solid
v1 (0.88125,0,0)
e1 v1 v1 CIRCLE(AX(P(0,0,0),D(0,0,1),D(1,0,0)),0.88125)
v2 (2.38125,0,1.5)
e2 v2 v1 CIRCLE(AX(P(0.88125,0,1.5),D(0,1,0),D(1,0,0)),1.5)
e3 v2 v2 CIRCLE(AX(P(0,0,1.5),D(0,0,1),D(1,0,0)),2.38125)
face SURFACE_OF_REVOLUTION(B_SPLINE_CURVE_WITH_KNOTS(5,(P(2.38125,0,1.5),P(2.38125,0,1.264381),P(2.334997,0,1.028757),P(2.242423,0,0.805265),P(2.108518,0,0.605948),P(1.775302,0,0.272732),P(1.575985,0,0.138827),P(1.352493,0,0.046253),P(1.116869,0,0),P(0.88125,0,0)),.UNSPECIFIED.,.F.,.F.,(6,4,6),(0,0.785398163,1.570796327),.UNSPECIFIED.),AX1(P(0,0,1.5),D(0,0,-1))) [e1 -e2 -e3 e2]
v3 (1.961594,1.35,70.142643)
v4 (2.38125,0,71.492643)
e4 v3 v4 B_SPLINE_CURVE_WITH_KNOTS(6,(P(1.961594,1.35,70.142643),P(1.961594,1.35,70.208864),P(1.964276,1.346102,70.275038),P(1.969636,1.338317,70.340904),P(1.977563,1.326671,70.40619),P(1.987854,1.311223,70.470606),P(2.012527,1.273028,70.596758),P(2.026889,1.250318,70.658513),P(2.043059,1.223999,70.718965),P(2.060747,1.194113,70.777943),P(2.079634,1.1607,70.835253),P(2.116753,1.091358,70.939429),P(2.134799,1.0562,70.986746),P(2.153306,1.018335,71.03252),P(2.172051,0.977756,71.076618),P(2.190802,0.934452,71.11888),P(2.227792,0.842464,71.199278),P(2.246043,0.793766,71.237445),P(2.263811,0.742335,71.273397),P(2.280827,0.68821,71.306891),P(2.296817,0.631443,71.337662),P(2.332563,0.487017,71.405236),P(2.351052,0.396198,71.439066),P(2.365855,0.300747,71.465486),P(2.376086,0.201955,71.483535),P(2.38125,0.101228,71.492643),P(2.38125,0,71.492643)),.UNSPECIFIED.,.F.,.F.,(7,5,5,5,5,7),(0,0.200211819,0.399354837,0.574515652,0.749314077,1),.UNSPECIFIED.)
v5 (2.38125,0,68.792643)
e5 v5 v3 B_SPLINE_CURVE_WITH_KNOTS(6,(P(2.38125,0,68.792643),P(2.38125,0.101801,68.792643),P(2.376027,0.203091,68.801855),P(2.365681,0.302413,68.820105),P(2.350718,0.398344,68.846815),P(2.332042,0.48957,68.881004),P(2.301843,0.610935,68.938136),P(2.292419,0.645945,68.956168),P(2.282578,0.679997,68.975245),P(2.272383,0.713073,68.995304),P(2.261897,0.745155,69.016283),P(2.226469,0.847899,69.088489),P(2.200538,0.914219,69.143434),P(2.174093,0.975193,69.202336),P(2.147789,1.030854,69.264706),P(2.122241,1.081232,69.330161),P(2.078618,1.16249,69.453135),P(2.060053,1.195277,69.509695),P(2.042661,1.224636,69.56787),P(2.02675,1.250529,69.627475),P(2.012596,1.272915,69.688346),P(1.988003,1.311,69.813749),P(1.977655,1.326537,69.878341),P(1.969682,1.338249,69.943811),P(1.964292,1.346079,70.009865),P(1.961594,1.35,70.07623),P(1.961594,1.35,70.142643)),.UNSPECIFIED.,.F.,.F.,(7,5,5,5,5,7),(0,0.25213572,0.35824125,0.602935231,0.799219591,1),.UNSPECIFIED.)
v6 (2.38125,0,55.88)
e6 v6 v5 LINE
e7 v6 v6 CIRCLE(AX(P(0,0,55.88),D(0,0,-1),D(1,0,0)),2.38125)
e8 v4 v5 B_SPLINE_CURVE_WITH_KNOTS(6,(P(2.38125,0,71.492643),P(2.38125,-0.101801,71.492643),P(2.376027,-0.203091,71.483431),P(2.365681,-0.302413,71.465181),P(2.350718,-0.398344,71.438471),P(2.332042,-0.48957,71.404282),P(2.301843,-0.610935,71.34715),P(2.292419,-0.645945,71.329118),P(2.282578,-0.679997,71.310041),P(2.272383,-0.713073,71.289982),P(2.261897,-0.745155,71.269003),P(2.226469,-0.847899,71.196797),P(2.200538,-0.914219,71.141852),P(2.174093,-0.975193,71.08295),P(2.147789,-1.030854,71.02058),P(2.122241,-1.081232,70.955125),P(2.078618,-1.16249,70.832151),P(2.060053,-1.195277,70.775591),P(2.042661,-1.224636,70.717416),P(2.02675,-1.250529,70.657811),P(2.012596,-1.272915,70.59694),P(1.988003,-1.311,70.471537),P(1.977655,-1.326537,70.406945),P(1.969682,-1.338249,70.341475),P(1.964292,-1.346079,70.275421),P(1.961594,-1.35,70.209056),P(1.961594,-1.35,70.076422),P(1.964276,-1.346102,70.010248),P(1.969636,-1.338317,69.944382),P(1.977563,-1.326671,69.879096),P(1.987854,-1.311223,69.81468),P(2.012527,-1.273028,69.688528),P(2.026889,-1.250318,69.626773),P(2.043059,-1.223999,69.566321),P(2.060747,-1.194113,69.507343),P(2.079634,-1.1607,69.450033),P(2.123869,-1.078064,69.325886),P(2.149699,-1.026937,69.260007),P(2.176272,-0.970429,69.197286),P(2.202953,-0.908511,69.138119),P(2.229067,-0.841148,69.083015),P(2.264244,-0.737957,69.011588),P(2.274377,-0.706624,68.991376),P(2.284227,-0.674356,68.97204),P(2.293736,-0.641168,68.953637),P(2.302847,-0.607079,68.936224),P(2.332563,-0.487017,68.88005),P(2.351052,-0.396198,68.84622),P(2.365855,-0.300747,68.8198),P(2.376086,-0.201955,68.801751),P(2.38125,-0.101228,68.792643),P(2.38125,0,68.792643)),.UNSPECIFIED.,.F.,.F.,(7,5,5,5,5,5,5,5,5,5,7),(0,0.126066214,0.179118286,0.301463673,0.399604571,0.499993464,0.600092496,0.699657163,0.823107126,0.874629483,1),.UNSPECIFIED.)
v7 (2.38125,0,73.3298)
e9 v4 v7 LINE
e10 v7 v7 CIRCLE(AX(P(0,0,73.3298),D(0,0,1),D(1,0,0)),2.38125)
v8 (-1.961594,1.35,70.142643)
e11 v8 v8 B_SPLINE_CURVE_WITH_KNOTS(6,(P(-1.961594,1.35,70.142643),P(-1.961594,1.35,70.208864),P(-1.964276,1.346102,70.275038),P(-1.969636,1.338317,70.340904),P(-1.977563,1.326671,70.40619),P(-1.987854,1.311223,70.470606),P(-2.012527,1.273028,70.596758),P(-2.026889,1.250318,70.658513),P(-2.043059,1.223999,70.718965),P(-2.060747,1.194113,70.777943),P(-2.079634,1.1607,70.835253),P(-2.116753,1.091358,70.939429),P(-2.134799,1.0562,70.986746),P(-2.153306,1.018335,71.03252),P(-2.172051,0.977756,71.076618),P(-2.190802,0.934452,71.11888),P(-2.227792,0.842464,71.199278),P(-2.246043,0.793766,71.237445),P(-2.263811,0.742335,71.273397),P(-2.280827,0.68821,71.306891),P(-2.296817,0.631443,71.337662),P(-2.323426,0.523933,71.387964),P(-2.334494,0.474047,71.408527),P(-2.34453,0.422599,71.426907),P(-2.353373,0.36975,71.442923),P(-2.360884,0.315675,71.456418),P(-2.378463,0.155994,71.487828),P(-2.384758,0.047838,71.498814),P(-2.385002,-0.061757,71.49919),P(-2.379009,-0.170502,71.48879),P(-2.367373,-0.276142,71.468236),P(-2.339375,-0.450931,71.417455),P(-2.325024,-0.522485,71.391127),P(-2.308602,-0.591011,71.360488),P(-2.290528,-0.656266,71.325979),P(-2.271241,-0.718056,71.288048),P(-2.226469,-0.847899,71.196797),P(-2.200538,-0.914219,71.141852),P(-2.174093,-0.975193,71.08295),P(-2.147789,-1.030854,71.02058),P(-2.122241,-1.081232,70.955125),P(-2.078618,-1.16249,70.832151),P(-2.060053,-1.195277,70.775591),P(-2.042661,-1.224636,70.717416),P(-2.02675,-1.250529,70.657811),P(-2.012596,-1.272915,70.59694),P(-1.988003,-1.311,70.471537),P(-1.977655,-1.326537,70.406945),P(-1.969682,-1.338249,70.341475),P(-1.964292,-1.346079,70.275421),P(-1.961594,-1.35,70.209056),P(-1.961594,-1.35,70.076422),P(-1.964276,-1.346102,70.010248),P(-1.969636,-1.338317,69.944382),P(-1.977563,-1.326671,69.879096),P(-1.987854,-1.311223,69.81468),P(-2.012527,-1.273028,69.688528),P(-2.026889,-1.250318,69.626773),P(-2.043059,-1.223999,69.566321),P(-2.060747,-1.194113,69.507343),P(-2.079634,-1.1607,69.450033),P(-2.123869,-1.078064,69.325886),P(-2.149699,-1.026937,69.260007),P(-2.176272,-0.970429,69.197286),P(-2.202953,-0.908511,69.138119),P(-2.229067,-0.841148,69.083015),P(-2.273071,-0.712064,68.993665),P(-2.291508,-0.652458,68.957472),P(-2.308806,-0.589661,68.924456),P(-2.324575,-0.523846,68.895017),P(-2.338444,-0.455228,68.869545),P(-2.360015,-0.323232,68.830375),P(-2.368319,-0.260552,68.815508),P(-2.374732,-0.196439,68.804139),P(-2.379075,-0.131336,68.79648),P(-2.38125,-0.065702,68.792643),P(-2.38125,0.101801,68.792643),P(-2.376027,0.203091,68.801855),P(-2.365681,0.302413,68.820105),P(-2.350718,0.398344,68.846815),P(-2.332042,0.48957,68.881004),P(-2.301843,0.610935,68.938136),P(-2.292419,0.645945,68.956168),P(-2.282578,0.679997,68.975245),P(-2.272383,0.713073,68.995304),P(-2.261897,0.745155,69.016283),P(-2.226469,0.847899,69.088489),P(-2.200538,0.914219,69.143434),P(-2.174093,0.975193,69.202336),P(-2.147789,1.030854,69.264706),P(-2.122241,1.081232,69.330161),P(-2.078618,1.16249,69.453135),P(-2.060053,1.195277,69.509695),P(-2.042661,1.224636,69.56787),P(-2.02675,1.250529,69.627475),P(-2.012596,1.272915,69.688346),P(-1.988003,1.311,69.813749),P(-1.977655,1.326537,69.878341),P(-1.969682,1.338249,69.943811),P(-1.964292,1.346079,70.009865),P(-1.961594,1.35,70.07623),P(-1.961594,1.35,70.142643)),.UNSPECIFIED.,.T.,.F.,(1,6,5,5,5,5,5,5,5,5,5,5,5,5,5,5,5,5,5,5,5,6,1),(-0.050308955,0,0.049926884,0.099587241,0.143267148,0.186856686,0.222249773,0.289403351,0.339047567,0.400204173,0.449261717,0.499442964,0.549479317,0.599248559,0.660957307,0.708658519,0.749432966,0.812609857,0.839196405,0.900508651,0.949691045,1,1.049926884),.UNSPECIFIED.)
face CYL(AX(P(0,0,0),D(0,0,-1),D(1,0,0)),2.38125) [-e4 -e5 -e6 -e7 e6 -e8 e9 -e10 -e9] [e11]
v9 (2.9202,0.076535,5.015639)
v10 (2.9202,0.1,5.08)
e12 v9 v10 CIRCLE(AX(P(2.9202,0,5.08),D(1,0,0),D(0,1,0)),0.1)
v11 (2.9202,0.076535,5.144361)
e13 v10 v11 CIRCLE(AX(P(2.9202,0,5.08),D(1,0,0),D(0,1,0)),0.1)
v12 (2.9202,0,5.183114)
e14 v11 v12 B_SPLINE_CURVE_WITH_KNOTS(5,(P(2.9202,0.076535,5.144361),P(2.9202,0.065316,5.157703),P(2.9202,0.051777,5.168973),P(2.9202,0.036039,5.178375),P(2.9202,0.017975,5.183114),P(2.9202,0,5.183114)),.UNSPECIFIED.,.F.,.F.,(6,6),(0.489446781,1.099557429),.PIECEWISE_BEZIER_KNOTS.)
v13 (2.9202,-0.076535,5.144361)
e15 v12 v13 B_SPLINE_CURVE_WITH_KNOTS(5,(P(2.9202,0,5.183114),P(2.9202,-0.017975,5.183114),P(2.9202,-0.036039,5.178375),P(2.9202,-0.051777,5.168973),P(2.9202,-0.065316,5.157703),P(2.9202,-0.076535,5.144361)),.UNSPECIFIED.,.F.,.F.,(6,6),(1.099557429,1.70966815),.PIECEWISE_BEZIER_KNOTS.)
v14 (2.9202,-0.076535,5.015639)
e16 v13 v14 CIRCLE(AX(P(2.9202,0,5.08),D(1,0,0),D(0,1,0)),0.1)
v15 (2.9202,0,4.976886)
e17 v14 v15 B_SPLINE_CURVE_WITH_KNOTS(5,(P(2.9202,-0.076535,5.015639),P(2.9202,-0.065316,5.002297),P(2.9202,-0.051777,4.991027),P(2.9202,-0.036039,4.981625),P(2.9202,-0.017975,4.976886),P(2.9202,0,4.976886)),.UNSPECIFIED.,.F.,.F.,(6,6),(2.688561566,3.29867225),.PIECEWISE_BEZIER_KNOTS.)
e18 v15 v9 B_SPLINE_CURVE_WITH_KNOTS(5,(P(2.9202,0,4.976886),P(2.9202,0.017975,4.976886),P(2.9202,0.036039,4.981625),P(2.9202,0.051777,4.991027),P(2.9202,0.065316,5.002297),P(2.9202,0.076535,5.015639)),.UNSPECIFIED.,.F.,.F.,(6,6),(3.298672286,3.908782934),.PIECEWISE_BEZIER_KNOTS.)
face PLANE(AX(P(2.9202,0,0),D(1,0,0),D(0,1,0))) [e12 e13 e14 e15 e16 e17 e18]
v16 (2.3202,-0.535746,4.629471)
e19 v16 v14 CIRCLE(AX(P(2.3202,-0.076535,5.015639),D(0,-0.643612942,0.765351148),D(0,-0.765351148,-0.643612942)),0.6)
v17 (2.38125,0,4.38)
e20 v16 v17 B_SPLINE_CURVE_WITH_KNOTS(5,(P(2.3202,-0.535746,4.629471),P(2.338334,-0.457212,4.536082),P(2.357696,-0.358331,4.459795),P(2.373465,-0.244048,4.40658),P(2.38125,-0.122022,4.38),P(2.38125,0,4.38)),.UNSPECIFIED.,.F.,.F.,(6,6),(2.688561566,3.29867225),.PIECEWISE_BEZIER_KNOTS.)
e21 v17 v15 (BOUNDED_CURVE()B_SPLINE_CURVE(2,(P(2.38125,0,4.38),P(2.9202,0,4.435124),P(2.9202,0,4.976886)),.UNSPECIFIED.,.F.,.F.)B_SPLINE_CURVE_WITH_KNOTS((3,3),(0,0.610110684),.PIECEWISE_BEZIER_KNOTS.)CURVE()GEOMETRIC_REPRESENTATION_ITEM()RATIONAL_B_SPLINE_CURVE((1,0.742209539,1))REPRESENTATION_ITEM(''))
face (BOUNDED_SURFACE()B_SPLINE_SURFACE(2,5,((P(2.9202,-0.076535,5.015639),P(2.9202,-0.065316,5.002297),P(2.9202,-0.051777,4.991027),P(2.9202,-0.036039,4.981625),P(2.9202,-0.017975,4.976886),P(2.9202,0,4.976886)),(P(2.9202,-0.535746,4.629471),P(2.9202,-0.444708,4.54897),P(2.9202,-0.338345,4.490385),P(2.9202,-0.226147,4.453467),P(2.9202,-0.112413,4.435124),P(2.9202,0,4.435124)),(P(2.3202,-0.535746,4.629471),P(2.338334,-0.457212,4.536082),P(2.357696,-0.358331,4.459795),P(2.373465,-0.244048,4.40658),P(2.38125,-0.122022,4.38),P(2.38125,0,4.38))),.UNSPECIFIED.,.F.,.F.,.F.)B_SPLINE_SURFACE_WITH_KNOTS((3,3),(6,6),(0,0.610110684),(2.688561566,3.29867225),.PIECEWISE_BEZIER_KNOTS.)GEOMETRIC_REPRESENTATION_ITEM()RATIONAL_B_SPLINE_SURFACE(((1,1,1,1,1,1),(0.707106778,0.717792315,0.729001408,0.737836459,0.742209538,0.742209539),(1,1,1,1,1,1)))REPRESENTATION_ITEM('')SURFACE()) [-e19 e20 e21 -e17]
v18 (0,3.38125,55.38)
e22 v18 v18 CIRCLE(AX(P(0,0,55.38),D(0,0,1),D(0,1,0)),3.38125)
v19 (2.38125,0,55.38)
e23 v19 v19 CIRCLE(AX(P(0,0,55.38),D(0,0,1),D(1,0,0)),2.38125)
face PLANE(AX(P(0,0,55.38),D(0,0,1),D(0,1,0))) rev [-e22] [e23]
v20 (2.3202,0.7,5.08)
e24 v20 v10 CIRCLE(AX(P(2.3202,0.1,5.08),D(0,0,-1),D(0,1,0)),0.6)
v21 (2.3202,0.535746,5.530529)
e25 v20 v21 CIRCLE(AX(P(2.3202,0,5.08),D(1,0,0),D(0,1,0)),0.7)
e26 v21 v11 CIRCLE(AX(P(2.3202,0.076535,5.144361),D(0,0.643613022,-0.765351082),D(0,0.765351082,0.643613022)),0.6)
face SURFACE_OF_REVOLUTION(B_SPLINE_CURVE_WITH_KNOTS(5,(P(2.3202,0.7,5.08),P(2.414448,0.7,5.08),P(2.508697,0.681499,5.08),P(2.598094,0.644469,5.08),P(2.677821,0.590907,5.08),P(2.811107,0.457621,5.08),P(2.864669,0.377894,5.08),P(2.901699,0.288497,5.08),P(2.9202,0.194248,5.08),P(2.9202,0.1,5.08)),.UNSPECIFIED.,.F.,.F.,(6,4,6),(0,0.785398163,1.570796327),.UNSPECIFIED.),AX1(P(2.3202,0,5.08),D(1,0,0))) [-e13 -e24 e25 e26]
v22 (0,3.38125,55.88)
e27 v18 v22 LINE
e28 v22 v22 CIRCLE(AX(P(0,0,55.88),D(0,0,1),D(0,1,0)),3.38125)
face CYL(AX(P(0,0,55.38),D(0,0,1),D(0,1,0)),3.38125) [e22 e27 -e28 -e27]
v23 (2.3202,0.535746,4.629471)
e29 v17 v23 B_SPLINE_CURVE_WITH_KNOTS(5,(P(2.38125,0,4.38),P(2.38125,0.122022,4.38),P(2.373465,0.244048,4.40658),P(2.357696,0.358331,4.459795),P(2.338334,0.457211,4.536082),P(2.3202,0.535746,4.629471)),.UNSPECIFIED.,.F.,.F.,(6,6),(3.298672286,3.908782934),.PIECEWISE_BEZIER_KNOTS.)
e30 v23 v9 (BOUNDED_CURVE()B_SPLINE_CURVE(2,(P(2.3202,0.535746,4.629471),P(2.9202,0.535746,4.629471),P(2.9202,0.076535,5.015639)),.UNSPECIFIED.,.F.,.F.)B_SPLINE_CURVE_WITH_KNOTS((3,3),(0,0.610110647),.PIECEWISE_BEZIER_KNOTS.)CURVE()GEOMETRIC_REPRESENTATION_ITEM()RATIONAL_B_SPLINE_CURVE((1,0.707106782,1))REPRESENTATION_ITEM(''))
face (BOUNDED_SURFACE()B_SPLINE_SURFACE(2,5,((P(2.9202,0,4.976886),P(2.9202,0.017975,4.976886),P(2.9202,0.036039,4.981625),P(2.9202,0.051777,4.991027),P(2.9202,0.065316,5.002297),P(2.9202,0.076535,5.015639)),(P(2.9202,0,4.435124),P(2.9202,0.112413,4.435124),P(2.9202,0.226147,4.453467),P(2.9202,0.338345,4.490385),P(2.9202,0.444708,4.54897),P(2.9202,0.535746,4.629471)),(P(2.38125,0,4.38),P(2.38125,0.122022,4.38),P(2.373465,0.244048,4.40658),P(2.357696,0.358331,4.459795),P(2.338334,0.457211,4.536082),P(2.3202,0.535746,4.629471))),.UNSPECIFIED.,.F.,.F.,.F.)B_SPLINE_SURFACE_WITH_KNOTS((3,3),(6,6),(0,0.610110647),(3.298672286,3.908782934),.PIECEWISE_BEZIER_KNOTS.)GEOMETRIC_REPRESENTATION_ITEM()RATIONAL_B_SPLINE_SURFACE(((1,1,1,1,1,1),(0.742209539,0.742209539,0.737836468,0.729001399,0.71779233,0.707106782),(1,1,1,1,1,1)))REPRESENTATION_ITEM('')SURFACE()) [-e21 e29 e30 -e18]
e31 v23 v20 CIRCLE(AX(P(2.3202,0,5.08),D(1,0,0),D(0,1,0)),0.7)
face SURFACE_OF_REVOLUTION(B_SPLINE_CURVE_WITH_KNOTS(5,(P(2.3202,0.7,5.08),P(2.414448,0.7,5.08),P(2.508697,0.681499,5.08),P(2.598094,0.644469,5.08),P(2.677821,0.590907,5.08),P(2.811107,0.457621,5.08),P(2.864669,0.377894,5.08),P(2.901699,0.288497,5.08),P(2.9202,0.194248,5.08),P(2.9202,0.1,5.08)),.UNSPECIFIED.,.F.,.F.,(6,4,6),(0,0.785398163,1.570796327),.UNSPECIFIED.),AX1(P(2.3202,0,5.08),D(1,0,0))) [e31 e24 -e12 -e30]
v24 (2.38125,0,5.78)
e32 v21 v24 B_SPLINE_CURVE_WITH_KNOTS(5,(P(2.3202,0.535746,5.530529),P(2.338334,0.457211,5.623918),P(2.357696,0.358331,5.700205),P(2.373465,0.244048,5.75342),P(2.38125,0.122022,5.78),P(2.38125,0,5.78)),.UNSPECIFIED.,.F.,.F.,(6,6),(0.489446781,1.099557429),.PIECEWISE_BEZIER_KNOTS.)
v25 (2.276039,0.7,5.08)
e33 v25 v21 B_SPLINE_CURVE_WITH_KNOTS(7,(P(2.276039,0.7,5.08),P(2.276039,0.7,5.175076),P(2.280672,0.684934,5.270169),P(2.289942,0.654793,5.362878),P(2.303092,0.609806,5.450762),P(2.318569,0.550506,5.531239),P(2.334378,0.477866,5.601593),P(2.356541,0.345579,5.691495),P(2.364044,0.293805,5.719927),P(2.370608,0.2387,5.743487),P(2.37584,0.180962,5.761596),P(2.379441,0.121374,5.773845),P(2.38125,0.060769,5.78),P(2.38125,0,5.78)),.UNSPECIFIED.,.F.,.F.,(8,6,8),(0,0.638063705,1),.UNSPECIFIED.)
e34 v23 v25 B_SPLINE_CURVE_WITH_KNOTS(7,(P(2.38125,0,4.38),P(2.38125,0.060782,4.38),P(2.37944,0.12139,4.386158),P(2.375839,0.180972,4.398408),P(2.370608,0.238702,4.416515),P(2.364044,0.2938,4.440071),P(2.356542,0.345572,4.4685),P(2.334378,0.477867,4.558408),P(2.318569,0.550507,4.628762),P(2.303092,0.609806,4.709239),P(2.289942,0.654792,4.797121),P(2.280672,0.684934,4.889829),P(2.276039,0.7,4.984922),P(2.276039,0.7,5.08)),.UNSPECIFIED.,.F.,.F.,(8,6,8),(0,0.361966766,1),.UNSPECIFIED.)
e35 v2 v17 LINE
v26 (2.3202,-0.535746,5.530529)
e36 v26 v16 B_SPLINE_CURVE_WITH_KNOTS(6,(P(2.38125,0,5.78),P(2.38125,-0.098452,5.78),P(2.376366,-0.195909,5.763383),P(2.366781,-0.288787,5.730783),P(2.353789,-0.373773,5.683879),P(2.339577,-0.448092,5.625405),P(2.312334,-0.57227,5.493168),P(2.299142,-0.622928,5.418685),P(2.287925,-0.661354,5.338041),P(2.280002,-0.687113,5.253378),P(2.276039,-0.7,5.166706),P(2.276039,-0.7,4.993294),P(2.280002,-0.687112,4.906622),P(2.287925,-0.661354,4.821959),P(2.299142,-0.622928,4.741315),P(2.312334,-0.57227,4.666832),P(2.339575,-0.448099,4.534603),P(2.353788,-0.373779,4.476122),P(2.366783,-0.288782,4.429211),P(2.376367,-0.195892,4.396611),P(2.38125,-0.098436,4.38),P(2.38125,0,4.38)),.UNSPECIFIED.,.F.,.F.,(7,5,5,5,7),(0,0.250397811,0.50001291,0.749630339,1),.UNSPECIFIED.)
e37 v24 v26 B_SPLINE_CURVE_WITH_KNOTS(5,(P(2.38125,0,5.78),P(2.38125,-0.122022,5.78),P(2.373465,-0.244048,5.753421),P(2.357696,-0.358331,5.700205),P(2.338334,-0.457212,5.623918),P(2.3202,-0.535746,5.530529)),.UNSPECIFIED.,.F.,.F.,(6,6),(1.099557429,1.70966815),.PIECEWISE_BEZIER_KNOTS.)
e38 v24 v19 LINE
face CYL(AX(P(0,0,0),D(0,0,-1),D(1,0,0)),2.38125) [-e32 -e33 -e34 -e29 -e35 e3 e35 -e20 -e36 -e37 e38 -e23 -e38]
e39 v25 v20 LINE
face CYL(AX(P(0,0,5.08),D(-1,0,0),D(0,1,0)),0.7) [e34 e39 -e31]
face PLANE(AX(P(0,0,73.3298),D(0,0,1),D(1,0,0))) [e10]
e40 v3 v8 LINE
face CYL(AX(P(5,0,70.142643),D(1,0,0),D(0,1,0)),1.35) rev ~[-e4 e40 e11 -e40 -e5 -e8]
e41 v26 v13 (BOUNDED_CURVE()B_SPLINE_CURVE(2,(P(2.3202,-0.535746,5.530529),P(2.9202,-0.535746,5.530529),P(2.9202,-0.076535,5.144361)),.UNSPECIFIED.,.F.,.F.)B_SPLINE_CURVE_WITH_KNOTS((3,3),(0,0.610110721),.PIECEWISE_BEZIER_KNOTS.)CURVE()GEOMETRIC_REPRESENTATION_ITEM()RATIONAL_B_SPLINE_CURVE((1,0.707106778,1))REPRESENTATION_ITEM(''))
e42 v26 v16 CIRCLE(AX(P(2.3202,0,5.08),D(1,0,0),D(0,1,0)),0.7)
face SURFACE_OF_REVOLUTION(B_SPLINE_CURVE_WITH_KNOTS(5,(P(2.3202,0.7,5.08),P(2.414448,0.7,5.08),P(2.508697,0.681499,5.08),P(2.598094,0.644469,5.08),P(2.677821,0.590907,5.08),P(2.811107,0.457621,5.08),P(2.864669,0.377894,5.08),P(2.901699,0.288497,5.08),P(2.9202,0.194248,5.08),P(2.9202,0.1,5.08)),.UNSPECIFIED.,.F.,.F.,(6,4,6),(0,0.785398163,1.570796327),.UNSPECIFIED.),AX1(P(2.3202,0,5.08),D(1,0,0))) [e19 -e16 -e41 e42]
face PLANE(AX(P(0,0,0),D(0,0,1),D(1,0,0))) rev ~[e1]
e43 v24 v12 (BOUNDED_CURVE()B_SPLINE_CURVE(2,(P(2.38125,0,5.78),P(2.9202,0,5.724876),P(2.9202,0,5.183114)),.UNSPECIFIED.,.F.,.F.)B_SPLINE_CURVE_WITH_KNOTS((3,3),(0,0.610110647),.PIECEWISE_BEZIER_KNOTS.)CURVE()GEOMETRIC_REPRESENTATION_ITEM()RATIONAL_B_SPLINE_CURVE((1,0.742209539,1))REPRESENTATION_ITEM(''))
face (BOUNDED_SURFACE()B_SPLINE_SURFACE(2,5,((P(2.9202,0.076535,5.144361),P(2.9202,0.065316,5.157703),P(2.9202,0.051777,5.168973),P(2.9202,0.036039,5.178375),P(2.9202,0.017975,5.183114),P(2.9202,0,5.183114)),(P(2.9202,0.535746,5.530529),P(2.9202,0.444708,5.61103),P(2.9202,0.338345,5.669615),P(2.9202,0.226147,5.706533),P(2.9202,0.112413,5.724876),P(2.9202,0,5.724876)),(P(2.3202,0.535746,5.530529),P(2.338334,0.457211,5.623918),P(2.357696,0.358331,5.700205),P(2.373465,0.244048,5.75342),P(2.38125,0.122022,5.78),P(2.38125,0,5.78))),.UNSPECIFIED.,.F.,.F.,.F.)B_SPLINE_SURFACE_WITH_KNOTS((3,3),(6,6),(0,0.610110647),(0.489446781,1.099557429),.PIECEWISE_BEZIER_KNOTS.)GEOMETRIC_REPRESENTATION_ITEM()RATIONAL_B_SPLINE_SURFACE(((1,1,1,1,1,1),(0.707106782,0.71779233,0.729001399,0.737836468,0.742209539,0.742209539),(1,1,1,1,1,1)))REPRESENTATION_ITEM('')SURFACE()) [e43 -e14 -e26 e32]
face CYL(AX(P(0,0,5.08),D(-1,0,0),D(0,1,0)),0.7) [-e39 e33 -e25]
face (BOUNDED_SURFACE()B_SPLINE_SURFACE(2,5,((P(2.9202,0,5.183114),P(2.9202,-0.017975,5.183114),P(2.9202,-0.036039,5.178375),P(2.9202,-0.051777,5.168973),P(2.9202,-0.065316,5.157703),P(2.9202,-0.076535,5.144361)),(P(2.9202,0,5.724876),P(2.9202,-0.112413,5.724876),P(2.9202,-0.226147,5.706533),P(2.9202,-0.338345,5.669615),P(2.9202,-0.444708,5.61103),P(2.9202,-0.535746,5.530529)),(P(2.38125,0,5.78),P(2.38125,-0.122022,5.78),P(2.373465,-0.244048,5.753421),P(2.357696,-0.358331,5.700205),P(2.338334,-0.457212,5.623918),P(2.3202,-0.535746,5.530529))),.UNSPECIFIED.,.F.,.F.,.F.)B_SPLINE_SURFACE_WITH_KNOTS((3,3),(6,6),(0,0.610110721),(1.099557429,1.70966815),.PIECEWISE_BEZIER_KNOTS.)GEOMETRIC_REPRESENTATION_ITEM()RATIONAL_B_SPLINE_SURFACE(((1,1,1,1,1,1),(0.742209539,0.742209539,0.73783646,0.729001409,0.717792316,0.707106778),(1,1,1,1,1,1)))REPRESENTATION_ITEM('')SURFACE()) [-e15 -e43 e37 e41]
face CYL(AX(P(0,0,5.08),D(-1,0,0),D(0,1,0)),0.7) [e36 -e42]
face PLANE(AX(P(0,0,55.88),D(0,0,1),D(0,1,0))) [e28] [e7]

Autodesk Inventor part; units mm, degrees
ref_plane "XZ Plane" through (0, 0, 0) normal (0, 1, 0) x (-1, 0, 0)
ref_plane "XY Plane" through (0, 0, 0) normal (0, 0, 1) x (1, 0, 0)
sketch "Sketch1" plane through (0, 0, 0) normal (0, 0, 1) x (1, 0, 0)
  circle A0 centre (0, 0) radius 2.38125
  dimension "d0" = 4.7625
extrude "Extrusion1" add sketch "Sketch1" along normal blind 73.3298
ref_plane "Work Plane1" through (5, 0, 0) normal (1, 0, 0) x (0, 1, 0)
sketch "Sketch2" plane through (5, 0, 0) normal (1, 0, 0) x (0, 1, 0)
  line L0 (-2.38125, 73.3298) -> (2.38125, 73.3298)
  line L1 (-2.38125, 0) -> (2.38125, 0)
  line L2 (-2.38125, 0) -> (-2.38125, 73.3298)
  line L3 (2.38125, 0) -> (2.38125, 73.3298)
  circle A0 centre (0, 70.142643) radius 1.35
  point P0 (0, 0)
  dimension "d4" = 2.7
extrude "Extrusion2" cut sketch "Sketch2" against normal blind 39.4202 contours A0
sketch "Sketch3" plane through (0, 0, 0) normal (1, 0, 0) x (0, 1, 0)
  arc A0 (-1.35, 70.142643) -> (-1.35, 70.142643) centre (-1.35, 70.142643) ccw
  arc A1 (-1.35, 70.142643) -> (-1.35, 70.142643) centre (-1.35, 70.142643) ccw
  line L0 (-2.38125, 73.3298) -> (2.38125, 73.3298)
  line L1 (-2.38125, 0) -> (2.38125, 0)
  line L2 (2.38125, 0) -> (2.38125, 73.3298)
  line L3 (-2.38125, 0) -> (-2.38125, 73.3298)
  line L4 (2.38125, 55.88) -> (3.38125, 55.88)
  line L5 (3.38125, 55.88) -> (3.38125, 55.38)
  line L6 (3.38125, 55.38) -> (2.38125, 55.38)
  line L7 (2.38125, 55.38) -> (2.38125, 55.88)
  line L8 (0, -14.66596) -> (0, 87.99576)
  point P0 (0, 0)
  dimension "d7" = 1
  dimension "d8" = 0.5
  dimension "d9" = 17.4498
sketch "Sketch3 outline for Revolution1" plane through (0, 0, 0) normal (1, 0, 0) x (0, 1, 0)
  line L0 (3.38125, 55.88) -> (2.38125, 55.88)
  line L1 (3.38125, 55.38) -> (3.38125, 55.88)
  line L2 (2.38125, 55.38) -> (3.38125, 55.38)
  line L3 (2.38125, 55.88) -> (2.38125, 55.38)
revolve "Revolution1" add sketch "Sketch3 outline for Revolution1" angle 360 about axis through (0, 0, -10) along (0, 0, 1)
sketch "Sketch4" plane through (0, 0, 0) normal (1, 0, 0) x (0, 1, 0)
  circle A0 centre (0, 5.08) radius 0.7
  point P0 (0, 0)
  dimension "d11" = 1.4
  dimension "d12" = 5.08
extrude "Extrusion3" add sketch "Sketch4" along normal blind 2.9202
fillet "Fillet1" radius 0.6 1 edges at (2.9202, -0.7, 5.08)
fillet "Fillet2" radius 1.5 1 edges at (-2.3813, 0, 0)
properties part number "launcher.RBFpin"
